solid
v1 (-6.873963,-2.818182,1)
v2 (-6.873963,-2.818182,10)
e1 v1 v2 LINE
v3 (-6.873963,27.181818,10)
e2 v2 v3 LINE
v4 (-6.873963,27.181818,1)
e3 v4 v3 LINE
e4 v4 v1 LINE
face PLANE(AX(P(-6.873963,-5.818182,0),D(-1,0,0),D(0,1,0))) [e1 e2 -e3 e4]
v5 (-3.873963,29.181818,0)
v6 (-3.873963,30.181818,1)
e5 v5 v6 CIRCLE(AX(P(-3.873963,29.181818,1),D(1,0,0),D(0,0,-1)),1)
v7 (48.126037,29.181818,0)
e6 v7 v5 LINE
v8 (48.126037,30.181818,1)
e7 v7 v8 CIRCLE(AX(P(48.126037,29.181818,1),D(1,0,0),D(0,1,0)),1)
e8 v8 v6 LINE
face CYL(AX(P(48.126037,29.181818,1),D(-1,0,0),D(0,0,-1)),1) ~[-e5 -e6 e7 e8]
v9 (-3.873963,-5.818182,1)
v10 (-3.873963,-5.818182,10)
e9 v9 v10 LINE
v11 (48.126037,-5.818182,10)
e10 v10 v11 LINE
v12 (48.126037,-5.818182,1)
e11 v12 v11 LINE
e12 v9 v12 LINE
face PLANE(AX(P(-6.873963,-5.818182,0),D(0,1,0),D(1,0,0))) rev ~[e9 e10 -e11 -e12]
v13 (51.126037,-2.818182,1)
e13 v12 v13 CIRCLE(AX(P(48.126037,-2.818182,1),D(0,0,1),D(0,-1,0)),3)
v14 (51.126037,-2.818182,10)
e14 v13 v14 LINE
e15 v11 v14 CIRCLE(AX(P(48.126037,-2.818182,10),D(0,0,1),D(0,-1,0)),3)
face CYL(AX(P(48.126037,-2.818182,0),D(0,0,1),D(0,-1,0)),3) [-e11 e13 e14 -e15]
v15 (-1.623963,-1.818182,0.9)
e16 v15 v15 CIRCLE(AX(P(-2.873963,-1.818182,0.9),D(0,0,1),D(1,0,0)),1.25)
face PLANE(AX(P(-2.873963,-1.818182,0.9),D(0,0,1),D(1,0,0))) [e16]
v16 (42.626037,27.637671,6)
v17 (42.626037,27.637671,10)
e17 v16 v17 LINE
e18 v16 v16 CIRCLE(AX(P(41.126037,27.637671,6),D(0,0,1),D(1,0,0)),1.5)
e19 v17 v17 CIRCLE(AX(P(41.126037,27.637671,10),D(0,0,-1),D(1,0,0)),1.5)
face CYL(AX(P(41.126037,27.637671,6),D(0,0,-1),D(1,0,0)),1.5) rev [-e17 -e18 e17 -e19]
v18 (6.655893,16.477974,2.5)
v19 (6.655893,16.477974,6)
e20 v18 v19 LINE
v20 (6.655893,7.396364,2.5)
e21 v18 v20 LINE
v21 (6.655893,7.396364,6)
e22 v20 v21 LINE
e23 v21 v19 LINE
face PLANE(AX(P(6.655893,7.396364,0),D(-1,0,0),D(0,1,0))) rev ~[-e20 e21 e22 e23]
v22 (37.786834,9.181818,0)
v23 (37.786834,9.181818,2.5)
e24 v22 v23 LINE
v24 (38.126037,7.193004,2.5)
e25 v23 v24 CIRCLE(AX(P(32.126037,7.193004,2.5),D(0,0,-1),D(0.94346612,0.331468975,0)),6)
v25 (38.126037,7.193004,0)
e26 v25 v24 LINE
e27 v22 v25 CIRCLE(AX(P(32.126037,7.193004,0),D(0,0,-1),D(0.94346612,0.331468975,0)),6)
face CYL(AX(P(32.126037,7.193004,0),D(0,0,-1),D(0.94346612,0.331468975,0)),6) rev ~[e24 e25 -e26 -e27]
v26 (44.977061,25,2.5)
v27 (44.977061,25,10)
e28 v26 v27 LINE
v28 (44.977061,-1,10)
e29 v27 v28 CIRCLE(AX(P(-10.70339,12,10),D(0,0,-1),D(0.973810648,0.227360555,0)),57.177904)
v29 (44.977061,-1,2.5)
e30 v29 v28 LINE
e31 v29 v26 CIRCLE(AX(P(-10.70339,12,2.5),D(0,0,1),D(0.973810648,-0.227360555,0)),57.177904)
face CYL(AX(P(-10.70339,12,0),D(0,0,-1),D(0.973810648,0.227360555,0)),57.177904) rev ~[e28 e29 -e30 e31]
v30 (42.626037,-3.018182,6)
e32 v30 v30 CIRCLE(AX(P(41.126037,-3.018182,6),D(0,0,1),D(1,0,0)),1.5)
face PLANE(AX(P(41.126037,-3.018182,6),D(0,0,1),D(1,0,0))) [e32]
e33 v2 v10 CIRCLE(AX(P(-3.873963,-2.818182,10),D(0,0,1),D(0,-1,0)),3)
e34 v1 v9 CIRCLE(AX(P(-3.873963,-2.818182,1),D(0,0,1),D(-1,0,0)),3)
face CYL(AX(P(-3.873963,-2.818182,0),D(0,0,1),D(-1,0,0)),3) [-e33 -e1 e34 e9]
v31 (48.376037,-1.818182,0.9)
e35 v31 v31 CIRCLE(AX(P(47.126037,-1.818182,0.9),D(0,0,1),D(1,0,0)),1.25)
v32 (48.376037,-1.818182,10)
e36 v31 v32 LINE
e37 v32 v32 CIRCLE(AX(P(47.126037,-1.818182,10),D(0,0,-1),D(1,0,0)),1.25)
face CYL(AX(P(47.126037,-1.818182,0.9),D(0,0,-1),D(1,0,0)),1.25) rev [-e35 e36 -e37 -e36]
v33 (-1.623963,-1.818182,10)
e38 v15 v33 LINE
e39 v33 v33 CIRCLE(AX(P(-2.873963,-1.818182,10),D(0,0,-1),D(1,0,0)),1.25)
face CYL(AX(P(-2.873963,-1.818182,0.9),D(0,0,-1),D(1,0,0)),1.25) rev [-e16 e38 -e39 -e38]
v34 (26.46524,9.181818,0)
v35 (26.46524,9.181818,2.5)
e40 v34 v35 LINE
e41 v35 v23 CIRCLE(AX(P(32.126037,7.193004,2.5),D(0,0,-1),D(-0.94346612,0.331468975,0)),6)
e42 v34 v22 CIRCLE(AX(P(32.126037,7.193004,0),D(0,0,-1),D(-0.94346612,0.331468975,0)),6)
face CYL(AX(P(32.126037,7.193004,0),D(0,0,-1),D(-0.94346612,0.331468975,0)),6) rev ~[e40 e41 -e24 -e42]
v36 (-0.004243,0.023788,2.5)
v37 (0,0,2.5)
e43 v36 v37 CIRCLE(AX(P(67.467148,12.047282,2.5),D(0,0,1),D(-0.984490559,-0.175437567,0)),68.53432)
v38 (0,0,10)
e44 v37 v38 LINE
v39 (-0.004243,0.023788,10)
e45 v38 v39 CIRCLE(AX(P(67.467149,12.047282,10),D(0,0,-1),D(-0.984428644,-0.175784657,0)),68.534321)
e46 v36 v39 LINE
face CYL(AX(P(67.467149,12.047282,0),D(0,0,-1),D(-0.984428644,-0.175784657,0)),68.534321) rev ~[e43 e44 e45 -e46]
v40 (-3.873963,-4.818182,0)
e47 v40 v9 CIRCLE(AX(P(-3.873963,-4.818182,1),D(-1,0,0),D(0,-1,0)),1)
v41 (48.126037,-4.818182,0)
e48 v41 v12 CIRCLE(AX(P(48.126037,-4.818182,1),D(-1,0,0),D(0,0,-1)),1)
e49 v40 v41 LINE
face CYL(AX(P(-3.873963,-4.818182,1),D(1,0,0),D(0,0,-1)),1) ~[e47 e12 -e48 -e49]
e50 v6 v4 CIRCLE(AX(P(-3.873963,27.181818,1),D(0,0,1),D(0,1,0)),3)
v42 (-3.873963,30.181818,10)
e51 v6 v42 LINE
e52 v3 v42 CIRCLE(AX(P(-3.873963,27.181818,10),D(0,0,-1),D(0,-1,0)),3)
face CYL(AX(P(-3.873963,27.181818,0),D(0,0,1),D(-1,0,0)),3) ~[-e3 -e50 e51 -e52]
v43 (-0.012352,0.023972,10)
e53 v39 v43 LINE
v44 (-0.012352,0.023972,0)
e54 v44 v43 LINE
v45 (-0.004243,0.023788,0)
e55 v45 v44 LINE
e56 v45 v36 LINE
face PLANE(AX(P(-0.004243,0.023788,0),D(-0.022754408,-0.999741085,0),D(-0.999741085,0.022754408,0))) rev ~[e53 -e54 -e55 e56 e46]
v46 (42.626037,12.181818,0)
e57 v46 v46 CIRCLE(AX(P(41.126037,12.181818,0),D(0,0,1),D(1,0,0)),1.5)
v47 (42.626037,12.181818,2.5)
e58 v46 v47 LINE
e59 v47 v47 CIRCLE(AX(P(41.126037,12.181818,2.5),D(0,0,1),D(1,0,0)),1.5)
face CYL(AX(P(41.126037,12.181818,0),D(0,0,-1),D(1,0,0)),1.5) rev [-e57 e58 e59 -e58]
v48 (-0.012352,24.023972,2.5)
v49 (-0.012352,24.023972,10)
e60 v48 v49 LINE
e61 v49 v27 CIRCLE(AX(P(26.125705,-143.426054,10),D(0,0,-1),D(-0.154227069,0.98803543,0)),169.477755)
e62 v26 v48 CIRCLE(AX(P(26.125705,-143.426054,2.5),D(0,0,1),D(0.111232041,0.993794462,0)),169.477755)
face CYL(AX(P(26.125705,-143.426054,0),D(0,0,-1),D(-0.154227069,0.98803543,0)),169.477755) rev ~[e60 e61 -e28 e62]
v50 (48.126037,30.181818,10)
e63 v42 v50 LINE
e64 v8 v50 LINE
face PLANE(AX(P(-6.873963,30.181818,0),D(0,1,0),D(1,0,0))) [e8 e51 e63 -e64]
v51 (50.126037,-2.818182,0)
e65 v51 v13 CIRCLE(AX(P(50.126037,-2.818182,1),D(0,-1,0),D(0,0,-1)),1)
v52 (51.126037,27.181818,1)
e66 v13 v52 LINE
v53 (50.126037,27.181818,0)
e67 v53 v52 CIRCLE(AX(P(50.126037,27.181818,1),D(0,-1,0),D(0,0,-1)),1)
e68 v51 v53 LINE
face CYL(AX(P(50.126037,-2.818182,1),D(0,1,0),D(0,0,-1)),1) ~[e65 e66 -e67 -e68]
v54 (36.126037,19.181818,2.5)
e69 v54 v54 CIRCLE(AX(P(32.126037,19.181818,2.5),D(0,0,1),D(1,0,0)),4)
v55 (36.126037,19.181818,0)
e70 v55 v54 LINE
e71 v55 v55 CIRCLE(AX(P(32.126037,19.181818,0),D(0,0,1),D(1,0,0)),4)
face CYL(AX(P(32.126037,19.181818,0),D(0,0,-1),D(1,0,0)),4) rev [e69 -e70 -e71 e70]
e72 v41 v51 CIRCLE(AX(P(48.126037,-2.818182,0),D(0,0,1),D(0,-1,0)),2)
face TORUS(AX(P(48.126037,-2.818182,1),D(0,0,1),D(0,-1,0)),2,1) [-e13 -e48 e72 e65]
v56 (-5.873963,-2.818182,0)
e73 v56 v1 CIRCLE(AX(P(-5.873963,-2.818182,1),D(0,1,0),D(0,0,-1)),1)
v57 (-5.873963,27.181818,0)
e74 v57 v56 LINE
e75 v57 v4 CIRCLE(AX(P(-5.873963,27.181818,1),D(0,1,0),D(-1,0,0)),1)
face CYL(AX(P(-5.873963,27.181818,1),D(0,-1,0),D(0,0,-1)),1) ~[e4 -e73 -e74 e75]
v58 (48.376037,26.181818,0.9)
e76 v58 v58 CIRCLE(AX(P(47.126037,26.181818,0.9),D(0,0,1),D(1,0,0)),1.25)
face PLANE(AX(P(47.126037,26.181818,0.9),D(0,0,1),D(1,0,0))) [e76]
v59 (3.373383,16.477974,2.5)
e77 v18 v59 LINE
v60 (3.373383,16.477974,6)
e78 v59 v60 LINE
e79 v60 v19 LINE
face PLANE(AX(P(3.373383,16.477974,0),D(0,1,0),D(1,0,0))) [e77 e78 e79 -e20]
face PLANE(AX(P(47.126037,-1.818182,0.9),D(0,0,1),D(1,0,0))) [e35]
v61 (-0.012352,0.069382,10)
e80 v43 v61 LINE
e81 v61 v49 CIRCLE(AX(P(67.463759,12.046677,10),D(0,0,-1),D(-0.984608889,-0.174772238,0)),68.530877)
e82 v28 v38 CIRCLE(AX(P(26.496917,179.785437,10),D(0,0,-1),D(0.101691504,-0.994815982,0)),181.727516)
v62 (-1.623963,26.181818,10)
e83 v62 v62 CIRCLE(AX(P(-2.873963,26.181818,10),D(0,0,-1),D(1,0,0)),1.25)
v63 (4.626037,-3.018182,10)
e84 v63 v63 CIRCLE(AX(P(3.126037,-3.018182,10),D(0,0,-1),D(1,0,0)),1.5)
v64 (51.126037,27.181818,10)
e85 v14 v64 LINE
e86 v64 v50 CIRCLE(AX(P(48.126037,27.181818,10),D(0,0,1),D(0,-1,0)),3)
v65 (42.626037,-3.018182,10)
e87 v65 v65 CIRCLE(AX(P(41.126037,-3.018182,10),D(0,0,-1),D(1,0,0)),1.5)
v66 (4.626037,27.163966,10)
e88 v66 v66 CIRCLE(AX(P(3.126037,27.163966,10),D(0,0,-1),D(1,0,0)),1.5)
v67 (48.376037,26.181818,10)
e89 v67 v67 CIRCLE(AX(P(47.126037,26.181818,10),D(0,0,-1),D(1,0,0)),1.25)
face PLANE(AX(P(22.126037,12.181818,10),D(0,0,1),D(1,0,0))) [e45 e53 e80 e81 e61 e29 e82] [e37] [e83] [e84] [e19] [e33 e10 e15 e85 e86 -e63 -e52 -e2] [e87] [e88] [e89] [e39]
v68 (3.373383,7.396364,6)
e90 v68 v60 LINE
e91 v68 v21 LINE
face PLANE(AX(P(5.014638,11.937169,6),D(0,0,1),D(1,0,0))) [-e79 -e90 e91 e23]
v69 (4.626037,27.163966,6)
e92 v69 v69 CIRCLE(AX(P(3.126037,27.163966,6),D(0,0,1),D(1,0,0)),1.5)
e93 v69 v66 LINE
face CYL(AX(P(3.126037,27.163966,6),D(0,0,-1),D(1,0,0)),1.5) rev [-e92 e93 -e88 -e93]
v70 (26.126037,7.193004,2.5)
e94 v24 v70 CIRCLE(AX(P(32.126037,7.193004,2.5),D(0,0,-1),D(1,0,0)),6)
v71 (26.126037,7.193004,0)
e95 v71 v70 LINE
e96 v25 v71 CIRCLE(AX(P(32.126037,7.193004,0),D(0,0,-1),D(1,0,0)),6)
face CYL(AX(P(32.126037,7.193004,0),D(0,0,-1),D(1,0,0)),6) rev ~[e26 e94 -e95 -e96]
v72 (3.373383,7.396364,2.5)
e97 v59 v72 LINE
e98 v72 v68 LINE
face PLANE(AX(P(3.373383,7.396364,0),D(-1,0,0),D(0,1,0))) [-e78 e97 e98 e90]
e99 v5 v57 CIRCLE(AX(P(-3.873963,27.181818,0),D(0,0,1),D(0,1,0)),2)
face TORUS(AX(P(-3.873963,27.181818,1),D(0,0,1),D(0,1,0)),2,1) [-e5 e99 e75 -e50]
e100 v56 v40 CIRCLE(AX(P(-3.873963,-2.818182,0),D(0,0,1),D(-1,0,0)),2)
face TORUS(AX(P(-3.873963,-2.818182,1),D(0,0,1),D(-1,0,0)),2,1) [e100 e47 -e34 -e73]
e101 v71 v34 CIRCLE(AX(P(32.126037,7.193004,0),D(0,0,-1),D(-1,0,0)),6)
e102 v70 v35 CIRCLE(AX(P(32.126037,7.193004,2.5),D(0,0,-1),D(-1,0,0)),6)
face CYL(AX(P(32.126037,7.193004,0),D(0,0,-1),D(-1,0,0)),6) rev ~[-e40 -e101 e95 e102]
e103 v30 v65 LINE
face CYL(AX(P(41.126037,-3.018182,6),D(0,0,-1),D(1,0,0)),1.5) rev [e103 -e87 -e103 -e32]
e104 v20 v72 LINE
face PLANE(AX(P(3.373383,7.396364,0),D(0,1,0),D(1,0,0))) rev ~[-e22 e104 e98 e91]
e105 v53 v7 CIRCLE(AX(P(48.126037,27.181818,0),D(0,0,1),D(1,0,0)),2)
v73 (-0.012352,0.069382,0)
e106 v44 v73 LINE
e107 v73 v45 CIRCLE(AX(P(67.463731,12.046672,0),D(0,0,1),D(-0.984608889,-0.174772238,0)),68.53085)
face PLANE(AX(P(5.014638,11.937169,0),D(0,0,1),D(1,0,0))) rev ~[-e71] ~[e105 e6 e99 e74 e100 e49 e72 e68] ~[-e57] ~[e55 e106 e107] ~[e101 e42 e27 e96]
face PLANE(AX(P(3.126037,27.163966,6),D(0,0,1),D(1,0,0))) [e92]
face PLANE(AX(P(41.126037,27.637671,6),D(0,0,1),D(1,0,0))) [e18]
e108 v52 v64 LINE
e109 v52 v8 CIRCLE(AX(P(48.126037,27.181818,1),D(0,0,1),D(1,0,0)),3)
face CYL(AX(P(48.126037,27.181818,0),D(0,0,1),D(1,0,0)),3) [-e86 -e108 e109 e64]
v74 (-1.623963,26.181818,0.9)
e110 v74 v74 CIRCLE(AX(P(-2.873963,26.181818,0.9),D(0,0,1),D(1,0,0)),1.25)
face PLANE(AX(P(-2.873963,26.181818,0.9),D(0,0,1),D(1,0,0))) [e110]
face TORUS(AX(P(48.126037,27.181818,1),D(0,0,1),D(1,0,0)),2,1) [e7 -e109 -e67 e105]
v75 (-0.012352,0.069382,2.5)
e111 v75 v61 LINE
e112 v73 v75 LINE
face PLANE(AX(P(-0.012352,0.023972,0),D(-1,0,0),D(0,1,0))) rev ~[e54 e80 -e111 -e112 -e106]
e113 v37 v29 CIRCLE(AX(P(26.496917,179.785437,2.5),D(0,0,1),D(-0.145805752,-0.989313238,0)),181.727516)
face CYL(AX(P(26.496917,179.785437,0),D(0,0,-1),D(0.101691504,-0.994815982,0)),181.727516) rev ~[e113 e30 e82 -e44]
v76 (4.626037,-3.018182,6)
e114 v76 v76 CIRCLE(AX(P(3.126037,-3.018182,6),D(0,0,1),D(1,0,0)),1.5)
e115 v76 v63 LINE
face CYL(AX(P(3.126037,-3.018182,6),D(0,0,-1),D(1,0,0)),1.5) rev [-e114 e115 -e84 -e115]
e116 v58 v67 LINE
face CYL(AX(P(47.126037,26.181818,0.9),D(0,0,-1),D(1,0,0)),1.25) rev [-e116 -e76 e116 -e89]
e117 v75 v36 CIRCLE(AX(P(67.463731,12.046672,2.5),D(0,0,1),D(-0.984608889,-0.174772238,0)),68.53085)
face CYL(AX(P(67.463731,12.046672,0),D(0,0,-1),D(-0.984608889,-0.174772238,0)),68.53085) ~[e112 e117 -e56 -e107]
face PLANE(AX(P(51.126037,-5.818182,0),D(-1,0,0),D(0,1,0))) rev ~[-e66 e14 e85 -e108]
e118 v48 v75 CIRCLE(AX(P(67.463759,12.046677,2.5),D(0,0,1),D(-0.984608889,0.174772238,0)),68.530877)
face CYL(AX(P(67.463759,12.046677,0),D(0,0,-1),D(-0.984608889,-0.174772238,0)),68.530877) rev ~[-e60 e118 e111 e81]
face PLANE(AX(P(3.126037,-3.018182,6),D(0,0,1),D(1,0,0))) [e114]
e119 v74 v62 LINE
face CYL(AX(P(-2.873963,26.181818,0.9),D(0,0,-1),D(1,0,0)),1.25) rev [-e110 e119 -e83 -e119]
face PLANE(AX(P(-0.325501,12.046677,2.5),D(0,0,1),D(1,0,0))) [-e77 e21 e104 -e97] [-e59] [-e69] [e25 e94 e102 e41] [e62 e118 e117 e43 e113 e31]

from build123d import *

# Parameters (mm, degrees)
F0_W     = 58
F0_H     = 36
F0_R     = 1.25
F0_R_2   = 1.5
F1_DEPTH = 10
F0_R_3   = 1
F0_W_2   = 3.2825097442
F0_H_2   = 9.0816104785
F0_R_4   = 4
F2_DEPTH = 2.5
F3_R     = 3
F4_DEPTH = 6
F5_START = 0.9
F5_DEPTH = 16.2
F6_START = 6
F6_DEPTH = 10.7
F7_R     = 1


with BuildPart() as f1:
    # F0 (on Top) → F1 (new body)
    with BuildSketch(Plane.XY):
        with Locations((22.1260370687, 12.181818096)):
            Rectangle(F0_W, F0_H)
        with Locations((-2.8739629313, -1.818181904)):
            Circle(F0_R, mode=Mode.SUBTRACT)
        with Locations((3.1260370687, -3.018181904)):
            Circle(F0_R_2, mode=Mode.SUBTRACT)
        with Locations((41.1260370687, -3.018181904)):
            Circle(F0_R_2, mode=Mode.SUBTRACT)
        with Locations((47.1260370687, -1.818181904)):
            Circle(F0_R, mode=Mode.SUBTRACT)
        with BuildLine():
            Line((-0.0042433119, 0.0237876128), (-0.0123524841, 0.02397218))
            Line((-0.0123524841, 0.02397218), (-0.0123524841, 0.0693824727))
            ThreePointArc((-0.0123524841, 0.0693824727), (-1.0671188126, 12.0466773263), (-0.0123524841, 24.02397218))
            ThreePointArc((-0.0123524841, 24.02397218), (22.4498159336, 26.0118318189), (44.9770614896, 25))
            ThreePointArc((44.9770614896, 25), (46.474513746, 12), (44.9770614896, -1))
            ThreePointArc((44.9770614896, -1), (22.4574664967, -1.8971785964), (0, 0))
            ThreePointArc((0, 0), (-0.0021227043, 0.0118936194), (-0.0042433119, 0.0237876128))
        make_face(mode=Mode.SUBTRACT)
        with Locations((-2.8739629313, 26.181818096)):
            Circle(F0_R, mode=Mode.SUBTRACT)
        with Locations((3.1260370687, 27.16396598)):
            Circle(F0_R_2, mode=Mode.SUBTRACT)
        with Locations((41.1260370687, 27.6376707083)):
            Circle(F0_R_2, mode=Mode.SUBTRACT)
        with Locations((47.1260370687, 26.181818096)):
            Circle(F0_R, mode=Mode.SUBTRACT)
        with Locations((-2.8739629313, 26.181818096)):
            Circle(F0_R)
        with Locations((47.1260370687, 26.181818096)):
            Circle(F0_R)
        with Locations((47.1260370687, -1.818181904)):
            Circle(F0_R)
        with Locations((-2.8739629313, -1.818181904)):
            Circle(F0_R)
        with Locations((3.1260370687, -3.018181904)):
            Circle(F0_R_2)
        with Locations((3.1260370687, 27.16396598)):
            Circle(F0_R_2)
        with Locations((41.1260370687, 27.6376707083)):
            Circle(F0_R_2)
        with Locations((41.1260370687, -3.018181904)):
            Circle(F0_R_2)
    extrude(amount=F1_DEPTH)

    # F0 (on Top) → F2 (join)
    with BuildSketch(Plane.XY):
        with BuildLine():
            ThreePointArc((-0.0123524841, 24.02397218), (-1.0671188126, 12.0466773263), (-0.0123524841, 0.0693824727))
            Line((-0.0123524841, 0.0693824727), (-0.0123524841, 24.02397218))
        make_face()
        with BuildLine():
            Line((-0.0123524841, 24.02397218), (-0.0123524841, 0.0693824727))
            ThreePointArc((-0.0123524841, 0.0693824727), (-0.0083017494, 0.0465843578), (-0.0042433119, 0.0237876128))
            Line((-0.0042433119, 0.0237876128), (44.9770614896, -1))
            Line((44.9770614896, -1), (44.9770614896, 25))
            Line((44.9770614896, 25), (-0.0123524841, 24.02397218))
        make_face()
        with Locations((2.9621722015, 2.0848012064)):
            Circle(F0_R_3, mode=Mode.SUBTRACT)
        with Locations((5.0146379508, 11.9371688925)):
            Rectangle(F0_W_2, F0_H_2, mode=Mode.SUBTRACT)
        with Locations((41.7125664489, 2.0848012064)):
            Circle(F0_R_3, mode=Mode.SUBTRACT)
        with BuildLine():
            Line((26.1260370687, 7.1930042468), (26.1260370687, 9.181818096))
            Line((26.1260370687, 9.181818096), (26.4652403515, 9.181818096))
            ThreePointArc((26.4652403515, 9.181818096), (32.1260370687, 13.1930042468), (37.7868337859, 9.181818096))
            Line((37.7868337859, 9.181818096), (38.1260370687, 9.181818096))
            Line((38.1260370687, 9.181818096), (38.1260370687, 7.1930042468))
            Line((38.1260370687, 7.1930042468), (38.1260370687, 1.181818096))
            Line((38.1260370687, 1.181818096), (26.1260370687, 1.181818096))
            Line((26.1260370687, 1.181818096), (26.1260370687, 7.1930042468))
        make_face(mode=Mode.SUBTRACT)
        with Locations((41.1260370687, 12.181818096)):
            Circle(F0_R_2, mode=Mode.SUBTRACT)
        with Locations((18.8074270263, 12.2937392443)):
            Circle(F0_R_3, mode=Mode.SUBTRACT)
        with Locations((2.9621722015, 21.6664075851)):
            Circle(F0_R_3, mode=Mode.SUBTRACT)
        with Locations((26.8074270263, 12.2937392443)):
            Circle(F0_R_3, mode=Mode.SUBTRACT)
        with Locations((32.1260370687, 19.181818096)):
            Circle(F0_R_4, mode=Mode.SUBTRACT)
        with Locations((41.7125664489, 21.6664075851)):
            Circle(F0_R_3, mode=Mode.SUBTRACT)
        with BuildLine():
            Line((44.9770614896, -1), (-0.0042433119, 0.0237876128))
            ThreePointArc((-0.0042433119, 0.0237876128), (-0.0021227043, 0.0118936194), (0, 0))
            ThreePointArc((0, 0), (22.4574664967, -1.8971785964), (44.9770614896, -1))
        make_face()
        with BuildLine():
            ThreePointArc((44.9770614896, 25), (22.4498159336, 26.0118318189), (-0.0123524841, 24.02397218))
            Line((-0.0123524841, 24.02397218), (44.9770614896, 25))
        make_face()
        with BuildLine():
            Line((44.9770614896, 25), (44.9770614896, -1))
            ThreePointArc((44.9770614896, -1), (46.474513746, 12), (44.9770614896, 25))
        make_face()
        with Locations((2.9621722015, 21.6664075851)):
            Circle(F0_R_3)
        with Locations((2.9621722015, 2.0848012064)):
            Circle(F0_R_3)
        with Locations((41.7125664489, 2.0848012064)):
            Circle(F0_R_3)
        with Locations((41.7125664489, 21.6664075851)):
            Circle(F0_R_3)
        with Locations((18.8074270263, 12.2937392443)):
            Circle(F0_R_3)
        with Locations((26.8074270263, 12.2937392443)):
            Circle(F0_R_3)
        with Locations((5.0146379508, 11.9371688925)):
            Rectangle(F0_W_2, F0_H_2)
        with BuildLine():
            Line((26.4652403515, 9.181818096), (26.1260370687, 9.181818096))
            Line((26.1260370687, 9.181818096), (26.1260370687, 7.1930042468))
            ThreePointArc((26.1260370687, 7.1930042468), (26.2114457767, 8.2017707453), (26.4652403515, 9.181818096))
        make_face()
        with BuildLine():
            ThreePointArc((38.1260370687, 7.1930042468), (32.1260370687, 1.1930042468), (26.1260370687, 7.1930042468))
            Line((26.1260370687, 7.1930042468), (26.1260370687, 1.181818096))
            Line((26.1260370687, 1.181818096), (38.1260370687, 1.181818096))
            Line((38.1260370687, 1.181818096), (38.1260370687, 7.1930042468))
        make_face()
        with BuildLine():
            Line((38.1260370687, 9.181818096), (37.7868337859, 9.181818096))
            ThreePointArc((37.7868337859, 9.181818096), (38.0406283607, 8.2017707453), (38.1260370687, 7.1930042468))
            Line((38.1260370687, 7.1930042468), (38.1260370687, 9.181818096))
        make_face()
    extrude(amount=F2_DEPTH)

    # F3
    f3_edges = [f1.edges().sort_by_distance(p)[0] for p in [
        (51.126037, 30.181818, 5),
        (51.126037, -5.818182, 5),
        (-6.873963, -5.818182, 5),
        (-6.873963, 30.181818, 5),
    ]]
    fillet(f3_edges, radius=F3_R)

    # F0 (on Top) → F4 (join)
    with BuildSketch(Plane.XY):
        with Locations((5.0146379508, 11.9371688925)):
            Rectangle(F0_W_2, F0_H_2)
    extrude(amount=F4_DEPTH)

    # F0 (on Top) → F5 (cut)
    with BuildSketch(Plane.XY.offset(F5_START)):
        with Locations((47.1260370687, 26.181818096)):
            Circle(F0_R)
        with Locations((-2.8739629313, 26.181818096)):
            Circle(F0_R)
        with Locations((-2.8739629313, -1.818181904)):
            Circle(F0_R)
        with Locations((47.1260370687, -1.818181904)):
            Circle(F0_R)
    extrude(amount=F5_DEPTH, mode=Mode.SUBTRACT)

    # F0 (on Top) → F6 (cut)
    with BuildSketch(Plane.XY.offset(F6_START)):
        with Locations((3.1260370687, 27.16396598)):
            Circle(F0_R_2)
        with Locations((41.1260370687, 27.6376707083)):
            Circle(F0_R_2)
        with Locations((41.1260370687, -3.018181904)):
            Circle(F0_R_2)
        with Locations((3.1260370687, -3.018181904)):
            Circle(F0_R_2)
    extrude(amount=F6_DEPTH, mode=Mode.SUBTRACT)

    # F7
    f7_edges = [f1.edges().sort_by_distance(p)[0] for p in [
        (51.126037, 12.181818, 0),
        (22.126037, -5.818182, 0),
        (50.247357, -4.939502, 0),
        (50.247357, 29.303138, 0),
        (22.126037, 30.181818, 0),
        (-5.995283, 29.303138, 0),
        (-6.873963, 12.181818, 0),
        (-5.995283, -4.939502, 0),
    ]]
    fillet(f7_edges, radius=F7_R)


solid = f1.part
